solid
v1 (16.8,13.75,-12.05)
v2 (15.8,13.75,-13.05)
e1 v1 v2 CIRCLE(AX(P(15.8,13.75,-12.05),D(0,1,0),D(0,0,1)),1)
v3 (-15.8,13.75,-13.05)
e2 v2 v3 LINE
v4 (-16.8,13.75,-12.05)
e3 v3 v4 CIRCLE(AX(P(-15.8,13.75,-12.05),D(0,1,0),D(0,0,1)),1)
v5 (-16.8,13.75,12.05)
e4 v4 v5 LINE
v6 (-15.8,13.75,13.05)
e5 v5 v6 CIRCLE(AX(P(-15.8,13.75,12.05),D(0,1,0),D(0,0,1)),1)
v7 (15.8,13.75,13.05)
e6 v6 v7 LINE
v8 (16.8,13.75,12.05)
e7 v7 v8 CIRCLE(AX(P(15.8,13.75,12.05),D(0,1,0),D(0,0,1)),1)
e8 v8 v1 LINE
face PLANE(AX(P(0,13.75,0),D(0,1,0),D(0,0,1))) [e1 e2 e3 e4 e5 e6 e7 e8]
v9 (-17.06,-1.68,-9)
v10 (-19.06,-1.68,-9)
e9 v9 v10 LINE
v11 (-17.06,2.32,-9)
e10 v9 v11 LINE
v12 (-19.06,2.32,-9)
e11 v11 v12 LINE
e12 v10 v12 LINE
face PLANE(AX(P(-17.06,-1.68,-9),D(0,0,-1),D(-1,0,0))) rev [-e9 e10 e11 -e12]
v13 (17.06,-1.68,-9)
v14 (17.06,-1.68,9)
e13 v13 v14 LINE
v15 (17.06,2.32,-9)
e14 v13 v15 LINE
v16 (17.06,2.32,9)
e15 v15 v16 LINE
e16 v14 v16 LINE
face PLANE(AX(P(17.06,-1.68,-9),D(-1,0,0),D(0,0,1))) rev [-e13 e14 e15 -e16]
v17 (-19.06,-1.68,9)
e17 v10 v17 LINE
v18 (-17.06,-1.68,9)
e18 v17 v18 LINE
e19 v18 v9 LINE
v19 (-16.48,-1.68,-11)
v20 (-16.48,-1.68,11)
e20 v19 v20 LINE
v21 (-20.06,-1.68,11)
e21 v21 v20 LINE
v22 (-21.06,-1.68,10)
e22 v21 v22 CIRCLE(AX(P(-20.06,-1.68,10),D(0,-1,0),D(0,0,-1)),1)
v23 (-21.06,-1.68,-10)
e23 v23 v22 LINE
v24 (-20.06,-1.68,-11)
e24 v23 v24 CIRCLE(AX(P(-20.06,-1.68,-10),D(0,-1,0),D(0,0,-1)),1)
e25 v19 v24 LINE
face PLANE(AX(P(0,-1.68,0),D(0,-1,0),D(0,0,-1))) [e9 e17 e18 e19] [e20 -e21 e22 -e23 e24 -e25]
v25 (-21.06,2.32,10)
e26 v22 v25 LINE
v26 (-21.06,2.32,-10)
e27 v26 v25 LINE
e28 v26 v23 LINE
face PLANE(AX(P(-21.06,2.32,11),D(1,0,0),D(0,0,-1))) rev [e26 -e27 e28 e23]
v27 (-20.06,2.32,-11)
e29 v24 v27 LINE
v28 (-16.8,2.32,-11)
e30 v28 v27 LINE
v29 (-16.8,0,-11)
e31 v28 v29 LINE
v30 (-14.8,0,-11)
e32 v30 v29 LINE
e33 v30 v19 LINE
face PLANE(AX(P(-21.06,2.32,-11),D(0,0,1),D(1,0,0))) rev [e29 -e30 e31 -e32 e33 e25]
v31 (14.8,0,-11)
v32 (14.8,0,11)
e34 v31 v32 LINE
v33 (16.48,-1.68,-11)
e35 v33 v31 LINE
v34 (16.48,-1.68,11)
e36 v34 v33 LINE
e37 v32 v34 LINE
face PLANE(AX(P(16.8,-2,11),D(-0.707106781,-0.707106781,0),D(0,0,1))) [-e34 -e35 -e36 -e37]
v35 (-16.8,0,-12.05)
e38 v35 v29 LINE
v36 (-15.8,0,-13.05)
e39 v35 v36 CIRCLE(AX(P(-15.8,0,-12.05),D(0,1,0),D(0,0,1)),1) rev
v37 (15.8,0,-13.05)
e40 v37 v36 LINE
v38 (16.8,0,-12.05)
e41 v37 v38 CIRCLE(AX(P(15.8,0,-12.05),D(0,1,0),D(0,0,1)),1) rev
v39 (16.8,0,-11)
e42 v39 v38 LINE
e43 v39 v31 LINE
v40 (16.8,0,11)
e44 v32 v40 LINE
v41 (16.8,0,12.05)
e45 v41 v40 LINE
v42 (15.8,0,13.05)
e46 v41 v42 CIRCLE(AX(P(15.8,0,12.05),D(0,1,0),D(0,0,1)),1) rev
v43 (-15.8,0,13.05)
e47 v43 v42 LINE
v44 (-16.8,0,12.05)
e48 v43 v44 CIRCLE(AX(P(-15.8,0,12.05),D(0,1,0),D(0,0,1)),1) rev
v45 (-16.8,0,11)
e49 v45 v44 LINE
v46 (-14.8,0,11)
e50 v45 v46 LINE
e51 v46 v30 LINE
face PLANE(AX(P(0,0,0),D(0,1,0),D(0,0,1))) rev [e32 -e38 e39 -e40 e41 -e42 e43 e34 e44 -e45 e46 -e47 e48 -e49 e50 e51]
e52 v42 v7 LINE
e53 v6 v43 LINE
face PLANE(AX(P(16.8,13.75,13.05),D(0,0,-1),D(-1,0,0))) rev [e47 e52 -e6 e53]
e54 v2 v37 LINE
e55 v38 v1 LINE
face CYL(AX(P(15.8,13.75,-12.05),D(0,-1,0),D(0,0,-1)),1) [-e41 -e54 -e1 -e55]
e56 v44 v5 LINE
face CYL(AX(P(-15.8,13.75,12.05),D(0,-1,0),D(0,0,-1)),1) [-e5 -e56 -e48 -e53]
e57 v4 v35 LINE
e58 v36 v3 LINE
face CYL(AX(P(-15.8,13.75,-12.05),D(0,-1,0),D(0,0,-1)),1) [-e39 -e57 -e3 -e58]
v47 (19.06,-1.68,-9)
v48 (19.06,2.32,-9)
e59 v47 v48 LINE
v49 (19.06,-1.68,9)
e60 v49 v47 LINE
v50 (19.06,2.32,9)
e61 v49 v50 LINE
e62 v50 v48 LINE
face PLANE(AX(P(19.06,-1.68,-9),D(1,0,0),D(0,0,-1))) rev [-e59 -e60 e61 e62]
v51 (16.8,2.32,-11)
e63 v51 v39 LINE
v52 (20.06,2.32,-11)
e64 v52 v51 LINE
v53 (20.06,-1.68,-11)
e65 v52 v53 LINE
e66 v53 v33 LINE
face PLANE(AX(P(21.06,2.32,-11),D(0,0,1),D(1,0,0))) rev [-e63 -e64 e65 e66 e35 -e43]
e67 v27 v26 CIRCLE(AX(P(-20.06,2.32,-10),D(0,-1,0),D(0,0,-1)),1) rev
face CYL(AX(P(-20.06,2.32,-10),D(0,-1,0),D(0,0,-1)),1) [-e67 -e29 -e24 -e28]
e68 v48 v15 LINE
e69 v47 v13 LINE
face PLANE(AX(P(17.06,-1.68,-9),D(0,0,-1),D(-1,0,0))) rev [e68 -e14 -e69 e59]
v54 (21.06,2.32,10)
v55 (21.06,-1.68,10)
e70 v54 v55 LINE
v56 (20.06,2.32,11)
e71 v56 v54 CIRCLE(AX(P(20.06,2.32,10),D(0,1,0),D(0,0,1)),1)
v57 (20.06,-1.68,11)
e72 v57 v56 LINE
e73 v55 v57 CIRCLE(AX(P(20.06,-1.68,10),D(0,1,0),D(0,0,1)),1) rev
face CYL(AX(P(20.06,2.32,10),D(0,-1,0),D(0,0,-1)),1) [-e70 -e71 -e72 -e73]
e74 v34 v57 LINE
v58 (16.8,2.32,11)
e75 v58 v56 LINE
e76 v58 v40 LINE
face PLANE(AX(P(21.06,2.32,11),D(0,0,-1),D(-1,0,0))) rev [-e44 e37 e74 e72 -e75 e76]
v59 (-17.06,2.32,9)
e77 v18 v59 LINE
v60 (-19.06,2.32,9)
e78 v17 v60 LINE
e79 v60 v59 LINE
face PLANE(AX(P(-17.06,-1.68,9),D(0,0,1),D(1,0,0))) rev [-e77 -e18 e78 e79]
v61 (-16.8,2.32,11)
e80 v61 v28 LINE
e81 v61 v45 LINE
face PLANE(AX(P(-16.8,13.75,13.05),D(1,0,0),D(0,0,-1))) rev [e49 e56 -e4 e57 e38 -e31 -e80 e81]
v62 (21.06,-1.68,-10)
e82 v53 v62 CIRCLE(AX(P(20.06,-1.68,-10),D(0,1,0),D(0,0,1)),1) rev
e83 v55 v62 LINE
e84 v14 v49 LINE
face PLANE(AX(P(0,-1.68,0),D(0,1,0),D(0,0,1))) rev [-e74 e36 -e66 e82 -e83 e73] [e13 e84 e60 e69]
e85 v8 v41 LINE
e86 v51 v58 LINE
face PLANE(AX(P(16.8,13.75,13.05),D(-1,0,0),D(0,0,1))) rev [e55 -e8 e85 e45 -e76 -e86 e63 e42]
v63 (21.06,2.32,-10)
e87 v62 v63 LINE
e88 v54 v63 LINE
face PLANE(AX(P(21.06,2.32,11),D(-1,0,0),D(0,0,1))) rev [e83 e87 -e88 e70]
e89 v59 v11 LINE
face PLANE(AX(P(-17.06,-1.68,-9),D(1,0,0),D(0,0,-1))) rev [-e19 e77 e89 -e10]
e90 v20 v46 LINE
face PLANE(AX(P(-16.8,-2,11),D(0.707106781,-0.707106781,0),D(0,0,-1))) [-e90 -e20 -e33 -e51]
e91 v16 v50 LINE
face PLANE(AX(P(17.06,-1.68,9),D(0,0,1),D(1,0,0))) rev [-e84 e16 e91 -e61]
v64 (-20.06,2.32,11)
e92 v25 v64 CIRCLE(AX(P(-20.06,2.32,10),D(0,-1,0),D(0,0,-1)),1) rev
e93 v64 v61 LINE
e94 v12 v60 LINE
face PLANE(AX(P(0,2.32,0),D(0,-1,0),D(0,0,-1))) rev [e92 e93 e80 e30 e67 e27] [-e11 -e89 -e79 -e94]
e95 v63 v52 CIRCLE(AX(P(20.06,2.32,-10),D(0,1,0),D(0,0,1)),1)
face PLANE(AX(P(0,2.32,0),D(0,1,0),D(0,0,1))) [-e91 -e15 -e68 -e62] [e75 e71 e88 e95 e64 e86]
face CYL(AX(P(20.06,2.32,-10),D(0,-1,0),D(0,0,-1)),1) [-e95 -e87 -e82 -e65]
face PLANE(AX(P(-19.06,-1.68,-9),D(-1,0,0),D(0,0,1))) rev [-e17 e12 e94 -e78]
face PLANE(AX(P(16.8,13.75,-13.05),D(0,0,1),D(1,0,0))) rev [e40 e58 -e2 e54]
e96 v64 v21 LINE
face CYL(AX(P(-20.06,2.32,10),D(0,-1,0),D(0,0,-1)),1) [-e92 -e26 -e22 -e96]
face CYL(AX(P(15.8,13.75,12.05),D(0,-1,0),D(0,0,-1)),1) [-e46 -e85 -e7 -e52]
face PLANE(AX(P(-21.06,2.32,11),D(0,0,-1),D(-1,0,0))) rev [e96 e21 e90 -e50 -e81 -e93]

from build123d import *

# Parameters (mm, degrees)
SKETCH1_W                = 33.6
SKETCH1_H                = 26.1
BOSS_EXTRUDE1_DEPTH      = 13.75
BOSS_EXTRUDE2_DEPTH      = 2.32
BOSS_EXTRUDE2_DEPTH_BACK = 1.68
SKETCH2_W                = 4.26
SKETCH2_H                = 22
SKETCH3_W                = 2
SKETCH3_H                = 18
CUT_EXTRUDE1_DEPTH       = 28.284995877
CHAMFER1_SIZE            = 2
FILLET1_R                = 1


with BuildPart() as part:
    # Sketch1 → Boss-Extrude1 (new body)
    with BuildSketch(Plane(origin=(0, 0, 0), x_dir=(1, 0, 0), z_dir=(0, 1, 0))):
        Rectangle(SKETCH1_W, SKETCH1_H)
    extrude(amount=BOSS_EXTRUDE1_DEPTH)

    # Sketch2 → Boss-Extrude2 (add, two sides: drawn at the far end of the back side and taken through both)
    with BuildSketch(Plane(origin=(0, 0, 0), x_dir=(1, 0, 0), z_dir=(0, 1, 0)).offset(-BOSS_EXTRUDE2_DEPTH_BACK)):
        with Locations((18.93, 0)):
            Rectangle(SKETCH2_W, SKETCH2_H)
        with Locations((-18.93, 0)):
            Rectangle(SKETCH2_W, SKETCH2_H)
    extrude(amount=BOSS_EXTRUDE2_DEPTH + BOSS_EXTRUDE2_DEPTH_BACK)

    # Sketch3 → Cut-Extrude1 (cut, through all)
    with BuildSketch(Plane(origin=(0, 2.32, 0), x_dir=(1, 0, 0), z_dir=(0, 1, 0))):
        with Locations((18.06, 0)):
            Rectangle(SKETCH3_W, SKETCH3_H)
        with Locations((-18.06, 0)):
            Rectangle(SKETCH3_W, SKETCH3_H)
    extrude(amount=-CUT_EXTRUDE1_DEPTH, mode=Mode.SUBTRACT)

    # Chamfer1
    # the kernel refuses this chamfer: 2 mm, written as the material it adds along each edge
    with BuildSketch(Plane(origin=(16.8, 0, -11), x_dir=(-0.9996219169112968, 0.027495876610586365, 0), z_dir=(0, 0, 1))) as chamfer1_piece_1_section:
        Polygon((CHAMFER1_SIZE * 0.999621916911, CHAMFER1_SIZE * 0.0274958766106), (-CHAMFER1_SIZE * 0.0274958766106, CHAMFER1_SIZE * 0.999621916911), (0, 0), align=None)
    chamfer1_piece_1 = extrude(amount=22, mode=Mode.PRIVATE)
    chamfer1_piece_1 = split(chamfer1_piece_1, bisect_by=Plane(origin=(16.11862069, -1.68, 0), z_dir=(0, 1, 0)), keep=Keep.TOP, mode=Mode.PRIVATE)
    add(chamfer1_piece_1)
    with BuildSketch(Plane(origin=(-16.8, 0, 11), x_dir=(0.9996219169112968, 0.027495876610586365, 0), z_dir=(0, 0, -1))) as chamfer1_piece_2_section:
        Polygon((CHAMFER1_SIZE * 0.999621916911, CHAMFER1_SIZE * 0.0274958766106), (-CHAMFER1_SIZE * 0.0274958766106, CHAMFER1_SIZE * 0.999621916911), (0, 0), align=None)
    chamfer1_piece_2 = extrude(amount=22, mode=Mode.PRIVATE)
    chamfer1_piece_2 = split(chamfer1_piece_2, bisect_by=Plane(origin=(-16.11862069, -1.68, 0), z_dir=(0, 1, 0)), keep=Keep.TOP, mode=Mode.PRIVATE)
    add(chamfer1_piece_2)

    # Fillet1
    fillet1_edges = [part.edges().sort_by_distance(p)[0] for p in [
        (21.06, 0.32, 11),
        (21.06, 0.32, -11),
        (-21.06, 0.32, -11),
        (-21.06, 0.32, 11),
        (-16.8, 6.875, -13.05),
        (16.8, 6.875, -13.05),
        (16.8, 6.875, 13.05),
        (-16.8, 6.875, 13.05),
    ]]
    fillet(fillet1_edges, radius=FILLET1_R)


solid = part.part
